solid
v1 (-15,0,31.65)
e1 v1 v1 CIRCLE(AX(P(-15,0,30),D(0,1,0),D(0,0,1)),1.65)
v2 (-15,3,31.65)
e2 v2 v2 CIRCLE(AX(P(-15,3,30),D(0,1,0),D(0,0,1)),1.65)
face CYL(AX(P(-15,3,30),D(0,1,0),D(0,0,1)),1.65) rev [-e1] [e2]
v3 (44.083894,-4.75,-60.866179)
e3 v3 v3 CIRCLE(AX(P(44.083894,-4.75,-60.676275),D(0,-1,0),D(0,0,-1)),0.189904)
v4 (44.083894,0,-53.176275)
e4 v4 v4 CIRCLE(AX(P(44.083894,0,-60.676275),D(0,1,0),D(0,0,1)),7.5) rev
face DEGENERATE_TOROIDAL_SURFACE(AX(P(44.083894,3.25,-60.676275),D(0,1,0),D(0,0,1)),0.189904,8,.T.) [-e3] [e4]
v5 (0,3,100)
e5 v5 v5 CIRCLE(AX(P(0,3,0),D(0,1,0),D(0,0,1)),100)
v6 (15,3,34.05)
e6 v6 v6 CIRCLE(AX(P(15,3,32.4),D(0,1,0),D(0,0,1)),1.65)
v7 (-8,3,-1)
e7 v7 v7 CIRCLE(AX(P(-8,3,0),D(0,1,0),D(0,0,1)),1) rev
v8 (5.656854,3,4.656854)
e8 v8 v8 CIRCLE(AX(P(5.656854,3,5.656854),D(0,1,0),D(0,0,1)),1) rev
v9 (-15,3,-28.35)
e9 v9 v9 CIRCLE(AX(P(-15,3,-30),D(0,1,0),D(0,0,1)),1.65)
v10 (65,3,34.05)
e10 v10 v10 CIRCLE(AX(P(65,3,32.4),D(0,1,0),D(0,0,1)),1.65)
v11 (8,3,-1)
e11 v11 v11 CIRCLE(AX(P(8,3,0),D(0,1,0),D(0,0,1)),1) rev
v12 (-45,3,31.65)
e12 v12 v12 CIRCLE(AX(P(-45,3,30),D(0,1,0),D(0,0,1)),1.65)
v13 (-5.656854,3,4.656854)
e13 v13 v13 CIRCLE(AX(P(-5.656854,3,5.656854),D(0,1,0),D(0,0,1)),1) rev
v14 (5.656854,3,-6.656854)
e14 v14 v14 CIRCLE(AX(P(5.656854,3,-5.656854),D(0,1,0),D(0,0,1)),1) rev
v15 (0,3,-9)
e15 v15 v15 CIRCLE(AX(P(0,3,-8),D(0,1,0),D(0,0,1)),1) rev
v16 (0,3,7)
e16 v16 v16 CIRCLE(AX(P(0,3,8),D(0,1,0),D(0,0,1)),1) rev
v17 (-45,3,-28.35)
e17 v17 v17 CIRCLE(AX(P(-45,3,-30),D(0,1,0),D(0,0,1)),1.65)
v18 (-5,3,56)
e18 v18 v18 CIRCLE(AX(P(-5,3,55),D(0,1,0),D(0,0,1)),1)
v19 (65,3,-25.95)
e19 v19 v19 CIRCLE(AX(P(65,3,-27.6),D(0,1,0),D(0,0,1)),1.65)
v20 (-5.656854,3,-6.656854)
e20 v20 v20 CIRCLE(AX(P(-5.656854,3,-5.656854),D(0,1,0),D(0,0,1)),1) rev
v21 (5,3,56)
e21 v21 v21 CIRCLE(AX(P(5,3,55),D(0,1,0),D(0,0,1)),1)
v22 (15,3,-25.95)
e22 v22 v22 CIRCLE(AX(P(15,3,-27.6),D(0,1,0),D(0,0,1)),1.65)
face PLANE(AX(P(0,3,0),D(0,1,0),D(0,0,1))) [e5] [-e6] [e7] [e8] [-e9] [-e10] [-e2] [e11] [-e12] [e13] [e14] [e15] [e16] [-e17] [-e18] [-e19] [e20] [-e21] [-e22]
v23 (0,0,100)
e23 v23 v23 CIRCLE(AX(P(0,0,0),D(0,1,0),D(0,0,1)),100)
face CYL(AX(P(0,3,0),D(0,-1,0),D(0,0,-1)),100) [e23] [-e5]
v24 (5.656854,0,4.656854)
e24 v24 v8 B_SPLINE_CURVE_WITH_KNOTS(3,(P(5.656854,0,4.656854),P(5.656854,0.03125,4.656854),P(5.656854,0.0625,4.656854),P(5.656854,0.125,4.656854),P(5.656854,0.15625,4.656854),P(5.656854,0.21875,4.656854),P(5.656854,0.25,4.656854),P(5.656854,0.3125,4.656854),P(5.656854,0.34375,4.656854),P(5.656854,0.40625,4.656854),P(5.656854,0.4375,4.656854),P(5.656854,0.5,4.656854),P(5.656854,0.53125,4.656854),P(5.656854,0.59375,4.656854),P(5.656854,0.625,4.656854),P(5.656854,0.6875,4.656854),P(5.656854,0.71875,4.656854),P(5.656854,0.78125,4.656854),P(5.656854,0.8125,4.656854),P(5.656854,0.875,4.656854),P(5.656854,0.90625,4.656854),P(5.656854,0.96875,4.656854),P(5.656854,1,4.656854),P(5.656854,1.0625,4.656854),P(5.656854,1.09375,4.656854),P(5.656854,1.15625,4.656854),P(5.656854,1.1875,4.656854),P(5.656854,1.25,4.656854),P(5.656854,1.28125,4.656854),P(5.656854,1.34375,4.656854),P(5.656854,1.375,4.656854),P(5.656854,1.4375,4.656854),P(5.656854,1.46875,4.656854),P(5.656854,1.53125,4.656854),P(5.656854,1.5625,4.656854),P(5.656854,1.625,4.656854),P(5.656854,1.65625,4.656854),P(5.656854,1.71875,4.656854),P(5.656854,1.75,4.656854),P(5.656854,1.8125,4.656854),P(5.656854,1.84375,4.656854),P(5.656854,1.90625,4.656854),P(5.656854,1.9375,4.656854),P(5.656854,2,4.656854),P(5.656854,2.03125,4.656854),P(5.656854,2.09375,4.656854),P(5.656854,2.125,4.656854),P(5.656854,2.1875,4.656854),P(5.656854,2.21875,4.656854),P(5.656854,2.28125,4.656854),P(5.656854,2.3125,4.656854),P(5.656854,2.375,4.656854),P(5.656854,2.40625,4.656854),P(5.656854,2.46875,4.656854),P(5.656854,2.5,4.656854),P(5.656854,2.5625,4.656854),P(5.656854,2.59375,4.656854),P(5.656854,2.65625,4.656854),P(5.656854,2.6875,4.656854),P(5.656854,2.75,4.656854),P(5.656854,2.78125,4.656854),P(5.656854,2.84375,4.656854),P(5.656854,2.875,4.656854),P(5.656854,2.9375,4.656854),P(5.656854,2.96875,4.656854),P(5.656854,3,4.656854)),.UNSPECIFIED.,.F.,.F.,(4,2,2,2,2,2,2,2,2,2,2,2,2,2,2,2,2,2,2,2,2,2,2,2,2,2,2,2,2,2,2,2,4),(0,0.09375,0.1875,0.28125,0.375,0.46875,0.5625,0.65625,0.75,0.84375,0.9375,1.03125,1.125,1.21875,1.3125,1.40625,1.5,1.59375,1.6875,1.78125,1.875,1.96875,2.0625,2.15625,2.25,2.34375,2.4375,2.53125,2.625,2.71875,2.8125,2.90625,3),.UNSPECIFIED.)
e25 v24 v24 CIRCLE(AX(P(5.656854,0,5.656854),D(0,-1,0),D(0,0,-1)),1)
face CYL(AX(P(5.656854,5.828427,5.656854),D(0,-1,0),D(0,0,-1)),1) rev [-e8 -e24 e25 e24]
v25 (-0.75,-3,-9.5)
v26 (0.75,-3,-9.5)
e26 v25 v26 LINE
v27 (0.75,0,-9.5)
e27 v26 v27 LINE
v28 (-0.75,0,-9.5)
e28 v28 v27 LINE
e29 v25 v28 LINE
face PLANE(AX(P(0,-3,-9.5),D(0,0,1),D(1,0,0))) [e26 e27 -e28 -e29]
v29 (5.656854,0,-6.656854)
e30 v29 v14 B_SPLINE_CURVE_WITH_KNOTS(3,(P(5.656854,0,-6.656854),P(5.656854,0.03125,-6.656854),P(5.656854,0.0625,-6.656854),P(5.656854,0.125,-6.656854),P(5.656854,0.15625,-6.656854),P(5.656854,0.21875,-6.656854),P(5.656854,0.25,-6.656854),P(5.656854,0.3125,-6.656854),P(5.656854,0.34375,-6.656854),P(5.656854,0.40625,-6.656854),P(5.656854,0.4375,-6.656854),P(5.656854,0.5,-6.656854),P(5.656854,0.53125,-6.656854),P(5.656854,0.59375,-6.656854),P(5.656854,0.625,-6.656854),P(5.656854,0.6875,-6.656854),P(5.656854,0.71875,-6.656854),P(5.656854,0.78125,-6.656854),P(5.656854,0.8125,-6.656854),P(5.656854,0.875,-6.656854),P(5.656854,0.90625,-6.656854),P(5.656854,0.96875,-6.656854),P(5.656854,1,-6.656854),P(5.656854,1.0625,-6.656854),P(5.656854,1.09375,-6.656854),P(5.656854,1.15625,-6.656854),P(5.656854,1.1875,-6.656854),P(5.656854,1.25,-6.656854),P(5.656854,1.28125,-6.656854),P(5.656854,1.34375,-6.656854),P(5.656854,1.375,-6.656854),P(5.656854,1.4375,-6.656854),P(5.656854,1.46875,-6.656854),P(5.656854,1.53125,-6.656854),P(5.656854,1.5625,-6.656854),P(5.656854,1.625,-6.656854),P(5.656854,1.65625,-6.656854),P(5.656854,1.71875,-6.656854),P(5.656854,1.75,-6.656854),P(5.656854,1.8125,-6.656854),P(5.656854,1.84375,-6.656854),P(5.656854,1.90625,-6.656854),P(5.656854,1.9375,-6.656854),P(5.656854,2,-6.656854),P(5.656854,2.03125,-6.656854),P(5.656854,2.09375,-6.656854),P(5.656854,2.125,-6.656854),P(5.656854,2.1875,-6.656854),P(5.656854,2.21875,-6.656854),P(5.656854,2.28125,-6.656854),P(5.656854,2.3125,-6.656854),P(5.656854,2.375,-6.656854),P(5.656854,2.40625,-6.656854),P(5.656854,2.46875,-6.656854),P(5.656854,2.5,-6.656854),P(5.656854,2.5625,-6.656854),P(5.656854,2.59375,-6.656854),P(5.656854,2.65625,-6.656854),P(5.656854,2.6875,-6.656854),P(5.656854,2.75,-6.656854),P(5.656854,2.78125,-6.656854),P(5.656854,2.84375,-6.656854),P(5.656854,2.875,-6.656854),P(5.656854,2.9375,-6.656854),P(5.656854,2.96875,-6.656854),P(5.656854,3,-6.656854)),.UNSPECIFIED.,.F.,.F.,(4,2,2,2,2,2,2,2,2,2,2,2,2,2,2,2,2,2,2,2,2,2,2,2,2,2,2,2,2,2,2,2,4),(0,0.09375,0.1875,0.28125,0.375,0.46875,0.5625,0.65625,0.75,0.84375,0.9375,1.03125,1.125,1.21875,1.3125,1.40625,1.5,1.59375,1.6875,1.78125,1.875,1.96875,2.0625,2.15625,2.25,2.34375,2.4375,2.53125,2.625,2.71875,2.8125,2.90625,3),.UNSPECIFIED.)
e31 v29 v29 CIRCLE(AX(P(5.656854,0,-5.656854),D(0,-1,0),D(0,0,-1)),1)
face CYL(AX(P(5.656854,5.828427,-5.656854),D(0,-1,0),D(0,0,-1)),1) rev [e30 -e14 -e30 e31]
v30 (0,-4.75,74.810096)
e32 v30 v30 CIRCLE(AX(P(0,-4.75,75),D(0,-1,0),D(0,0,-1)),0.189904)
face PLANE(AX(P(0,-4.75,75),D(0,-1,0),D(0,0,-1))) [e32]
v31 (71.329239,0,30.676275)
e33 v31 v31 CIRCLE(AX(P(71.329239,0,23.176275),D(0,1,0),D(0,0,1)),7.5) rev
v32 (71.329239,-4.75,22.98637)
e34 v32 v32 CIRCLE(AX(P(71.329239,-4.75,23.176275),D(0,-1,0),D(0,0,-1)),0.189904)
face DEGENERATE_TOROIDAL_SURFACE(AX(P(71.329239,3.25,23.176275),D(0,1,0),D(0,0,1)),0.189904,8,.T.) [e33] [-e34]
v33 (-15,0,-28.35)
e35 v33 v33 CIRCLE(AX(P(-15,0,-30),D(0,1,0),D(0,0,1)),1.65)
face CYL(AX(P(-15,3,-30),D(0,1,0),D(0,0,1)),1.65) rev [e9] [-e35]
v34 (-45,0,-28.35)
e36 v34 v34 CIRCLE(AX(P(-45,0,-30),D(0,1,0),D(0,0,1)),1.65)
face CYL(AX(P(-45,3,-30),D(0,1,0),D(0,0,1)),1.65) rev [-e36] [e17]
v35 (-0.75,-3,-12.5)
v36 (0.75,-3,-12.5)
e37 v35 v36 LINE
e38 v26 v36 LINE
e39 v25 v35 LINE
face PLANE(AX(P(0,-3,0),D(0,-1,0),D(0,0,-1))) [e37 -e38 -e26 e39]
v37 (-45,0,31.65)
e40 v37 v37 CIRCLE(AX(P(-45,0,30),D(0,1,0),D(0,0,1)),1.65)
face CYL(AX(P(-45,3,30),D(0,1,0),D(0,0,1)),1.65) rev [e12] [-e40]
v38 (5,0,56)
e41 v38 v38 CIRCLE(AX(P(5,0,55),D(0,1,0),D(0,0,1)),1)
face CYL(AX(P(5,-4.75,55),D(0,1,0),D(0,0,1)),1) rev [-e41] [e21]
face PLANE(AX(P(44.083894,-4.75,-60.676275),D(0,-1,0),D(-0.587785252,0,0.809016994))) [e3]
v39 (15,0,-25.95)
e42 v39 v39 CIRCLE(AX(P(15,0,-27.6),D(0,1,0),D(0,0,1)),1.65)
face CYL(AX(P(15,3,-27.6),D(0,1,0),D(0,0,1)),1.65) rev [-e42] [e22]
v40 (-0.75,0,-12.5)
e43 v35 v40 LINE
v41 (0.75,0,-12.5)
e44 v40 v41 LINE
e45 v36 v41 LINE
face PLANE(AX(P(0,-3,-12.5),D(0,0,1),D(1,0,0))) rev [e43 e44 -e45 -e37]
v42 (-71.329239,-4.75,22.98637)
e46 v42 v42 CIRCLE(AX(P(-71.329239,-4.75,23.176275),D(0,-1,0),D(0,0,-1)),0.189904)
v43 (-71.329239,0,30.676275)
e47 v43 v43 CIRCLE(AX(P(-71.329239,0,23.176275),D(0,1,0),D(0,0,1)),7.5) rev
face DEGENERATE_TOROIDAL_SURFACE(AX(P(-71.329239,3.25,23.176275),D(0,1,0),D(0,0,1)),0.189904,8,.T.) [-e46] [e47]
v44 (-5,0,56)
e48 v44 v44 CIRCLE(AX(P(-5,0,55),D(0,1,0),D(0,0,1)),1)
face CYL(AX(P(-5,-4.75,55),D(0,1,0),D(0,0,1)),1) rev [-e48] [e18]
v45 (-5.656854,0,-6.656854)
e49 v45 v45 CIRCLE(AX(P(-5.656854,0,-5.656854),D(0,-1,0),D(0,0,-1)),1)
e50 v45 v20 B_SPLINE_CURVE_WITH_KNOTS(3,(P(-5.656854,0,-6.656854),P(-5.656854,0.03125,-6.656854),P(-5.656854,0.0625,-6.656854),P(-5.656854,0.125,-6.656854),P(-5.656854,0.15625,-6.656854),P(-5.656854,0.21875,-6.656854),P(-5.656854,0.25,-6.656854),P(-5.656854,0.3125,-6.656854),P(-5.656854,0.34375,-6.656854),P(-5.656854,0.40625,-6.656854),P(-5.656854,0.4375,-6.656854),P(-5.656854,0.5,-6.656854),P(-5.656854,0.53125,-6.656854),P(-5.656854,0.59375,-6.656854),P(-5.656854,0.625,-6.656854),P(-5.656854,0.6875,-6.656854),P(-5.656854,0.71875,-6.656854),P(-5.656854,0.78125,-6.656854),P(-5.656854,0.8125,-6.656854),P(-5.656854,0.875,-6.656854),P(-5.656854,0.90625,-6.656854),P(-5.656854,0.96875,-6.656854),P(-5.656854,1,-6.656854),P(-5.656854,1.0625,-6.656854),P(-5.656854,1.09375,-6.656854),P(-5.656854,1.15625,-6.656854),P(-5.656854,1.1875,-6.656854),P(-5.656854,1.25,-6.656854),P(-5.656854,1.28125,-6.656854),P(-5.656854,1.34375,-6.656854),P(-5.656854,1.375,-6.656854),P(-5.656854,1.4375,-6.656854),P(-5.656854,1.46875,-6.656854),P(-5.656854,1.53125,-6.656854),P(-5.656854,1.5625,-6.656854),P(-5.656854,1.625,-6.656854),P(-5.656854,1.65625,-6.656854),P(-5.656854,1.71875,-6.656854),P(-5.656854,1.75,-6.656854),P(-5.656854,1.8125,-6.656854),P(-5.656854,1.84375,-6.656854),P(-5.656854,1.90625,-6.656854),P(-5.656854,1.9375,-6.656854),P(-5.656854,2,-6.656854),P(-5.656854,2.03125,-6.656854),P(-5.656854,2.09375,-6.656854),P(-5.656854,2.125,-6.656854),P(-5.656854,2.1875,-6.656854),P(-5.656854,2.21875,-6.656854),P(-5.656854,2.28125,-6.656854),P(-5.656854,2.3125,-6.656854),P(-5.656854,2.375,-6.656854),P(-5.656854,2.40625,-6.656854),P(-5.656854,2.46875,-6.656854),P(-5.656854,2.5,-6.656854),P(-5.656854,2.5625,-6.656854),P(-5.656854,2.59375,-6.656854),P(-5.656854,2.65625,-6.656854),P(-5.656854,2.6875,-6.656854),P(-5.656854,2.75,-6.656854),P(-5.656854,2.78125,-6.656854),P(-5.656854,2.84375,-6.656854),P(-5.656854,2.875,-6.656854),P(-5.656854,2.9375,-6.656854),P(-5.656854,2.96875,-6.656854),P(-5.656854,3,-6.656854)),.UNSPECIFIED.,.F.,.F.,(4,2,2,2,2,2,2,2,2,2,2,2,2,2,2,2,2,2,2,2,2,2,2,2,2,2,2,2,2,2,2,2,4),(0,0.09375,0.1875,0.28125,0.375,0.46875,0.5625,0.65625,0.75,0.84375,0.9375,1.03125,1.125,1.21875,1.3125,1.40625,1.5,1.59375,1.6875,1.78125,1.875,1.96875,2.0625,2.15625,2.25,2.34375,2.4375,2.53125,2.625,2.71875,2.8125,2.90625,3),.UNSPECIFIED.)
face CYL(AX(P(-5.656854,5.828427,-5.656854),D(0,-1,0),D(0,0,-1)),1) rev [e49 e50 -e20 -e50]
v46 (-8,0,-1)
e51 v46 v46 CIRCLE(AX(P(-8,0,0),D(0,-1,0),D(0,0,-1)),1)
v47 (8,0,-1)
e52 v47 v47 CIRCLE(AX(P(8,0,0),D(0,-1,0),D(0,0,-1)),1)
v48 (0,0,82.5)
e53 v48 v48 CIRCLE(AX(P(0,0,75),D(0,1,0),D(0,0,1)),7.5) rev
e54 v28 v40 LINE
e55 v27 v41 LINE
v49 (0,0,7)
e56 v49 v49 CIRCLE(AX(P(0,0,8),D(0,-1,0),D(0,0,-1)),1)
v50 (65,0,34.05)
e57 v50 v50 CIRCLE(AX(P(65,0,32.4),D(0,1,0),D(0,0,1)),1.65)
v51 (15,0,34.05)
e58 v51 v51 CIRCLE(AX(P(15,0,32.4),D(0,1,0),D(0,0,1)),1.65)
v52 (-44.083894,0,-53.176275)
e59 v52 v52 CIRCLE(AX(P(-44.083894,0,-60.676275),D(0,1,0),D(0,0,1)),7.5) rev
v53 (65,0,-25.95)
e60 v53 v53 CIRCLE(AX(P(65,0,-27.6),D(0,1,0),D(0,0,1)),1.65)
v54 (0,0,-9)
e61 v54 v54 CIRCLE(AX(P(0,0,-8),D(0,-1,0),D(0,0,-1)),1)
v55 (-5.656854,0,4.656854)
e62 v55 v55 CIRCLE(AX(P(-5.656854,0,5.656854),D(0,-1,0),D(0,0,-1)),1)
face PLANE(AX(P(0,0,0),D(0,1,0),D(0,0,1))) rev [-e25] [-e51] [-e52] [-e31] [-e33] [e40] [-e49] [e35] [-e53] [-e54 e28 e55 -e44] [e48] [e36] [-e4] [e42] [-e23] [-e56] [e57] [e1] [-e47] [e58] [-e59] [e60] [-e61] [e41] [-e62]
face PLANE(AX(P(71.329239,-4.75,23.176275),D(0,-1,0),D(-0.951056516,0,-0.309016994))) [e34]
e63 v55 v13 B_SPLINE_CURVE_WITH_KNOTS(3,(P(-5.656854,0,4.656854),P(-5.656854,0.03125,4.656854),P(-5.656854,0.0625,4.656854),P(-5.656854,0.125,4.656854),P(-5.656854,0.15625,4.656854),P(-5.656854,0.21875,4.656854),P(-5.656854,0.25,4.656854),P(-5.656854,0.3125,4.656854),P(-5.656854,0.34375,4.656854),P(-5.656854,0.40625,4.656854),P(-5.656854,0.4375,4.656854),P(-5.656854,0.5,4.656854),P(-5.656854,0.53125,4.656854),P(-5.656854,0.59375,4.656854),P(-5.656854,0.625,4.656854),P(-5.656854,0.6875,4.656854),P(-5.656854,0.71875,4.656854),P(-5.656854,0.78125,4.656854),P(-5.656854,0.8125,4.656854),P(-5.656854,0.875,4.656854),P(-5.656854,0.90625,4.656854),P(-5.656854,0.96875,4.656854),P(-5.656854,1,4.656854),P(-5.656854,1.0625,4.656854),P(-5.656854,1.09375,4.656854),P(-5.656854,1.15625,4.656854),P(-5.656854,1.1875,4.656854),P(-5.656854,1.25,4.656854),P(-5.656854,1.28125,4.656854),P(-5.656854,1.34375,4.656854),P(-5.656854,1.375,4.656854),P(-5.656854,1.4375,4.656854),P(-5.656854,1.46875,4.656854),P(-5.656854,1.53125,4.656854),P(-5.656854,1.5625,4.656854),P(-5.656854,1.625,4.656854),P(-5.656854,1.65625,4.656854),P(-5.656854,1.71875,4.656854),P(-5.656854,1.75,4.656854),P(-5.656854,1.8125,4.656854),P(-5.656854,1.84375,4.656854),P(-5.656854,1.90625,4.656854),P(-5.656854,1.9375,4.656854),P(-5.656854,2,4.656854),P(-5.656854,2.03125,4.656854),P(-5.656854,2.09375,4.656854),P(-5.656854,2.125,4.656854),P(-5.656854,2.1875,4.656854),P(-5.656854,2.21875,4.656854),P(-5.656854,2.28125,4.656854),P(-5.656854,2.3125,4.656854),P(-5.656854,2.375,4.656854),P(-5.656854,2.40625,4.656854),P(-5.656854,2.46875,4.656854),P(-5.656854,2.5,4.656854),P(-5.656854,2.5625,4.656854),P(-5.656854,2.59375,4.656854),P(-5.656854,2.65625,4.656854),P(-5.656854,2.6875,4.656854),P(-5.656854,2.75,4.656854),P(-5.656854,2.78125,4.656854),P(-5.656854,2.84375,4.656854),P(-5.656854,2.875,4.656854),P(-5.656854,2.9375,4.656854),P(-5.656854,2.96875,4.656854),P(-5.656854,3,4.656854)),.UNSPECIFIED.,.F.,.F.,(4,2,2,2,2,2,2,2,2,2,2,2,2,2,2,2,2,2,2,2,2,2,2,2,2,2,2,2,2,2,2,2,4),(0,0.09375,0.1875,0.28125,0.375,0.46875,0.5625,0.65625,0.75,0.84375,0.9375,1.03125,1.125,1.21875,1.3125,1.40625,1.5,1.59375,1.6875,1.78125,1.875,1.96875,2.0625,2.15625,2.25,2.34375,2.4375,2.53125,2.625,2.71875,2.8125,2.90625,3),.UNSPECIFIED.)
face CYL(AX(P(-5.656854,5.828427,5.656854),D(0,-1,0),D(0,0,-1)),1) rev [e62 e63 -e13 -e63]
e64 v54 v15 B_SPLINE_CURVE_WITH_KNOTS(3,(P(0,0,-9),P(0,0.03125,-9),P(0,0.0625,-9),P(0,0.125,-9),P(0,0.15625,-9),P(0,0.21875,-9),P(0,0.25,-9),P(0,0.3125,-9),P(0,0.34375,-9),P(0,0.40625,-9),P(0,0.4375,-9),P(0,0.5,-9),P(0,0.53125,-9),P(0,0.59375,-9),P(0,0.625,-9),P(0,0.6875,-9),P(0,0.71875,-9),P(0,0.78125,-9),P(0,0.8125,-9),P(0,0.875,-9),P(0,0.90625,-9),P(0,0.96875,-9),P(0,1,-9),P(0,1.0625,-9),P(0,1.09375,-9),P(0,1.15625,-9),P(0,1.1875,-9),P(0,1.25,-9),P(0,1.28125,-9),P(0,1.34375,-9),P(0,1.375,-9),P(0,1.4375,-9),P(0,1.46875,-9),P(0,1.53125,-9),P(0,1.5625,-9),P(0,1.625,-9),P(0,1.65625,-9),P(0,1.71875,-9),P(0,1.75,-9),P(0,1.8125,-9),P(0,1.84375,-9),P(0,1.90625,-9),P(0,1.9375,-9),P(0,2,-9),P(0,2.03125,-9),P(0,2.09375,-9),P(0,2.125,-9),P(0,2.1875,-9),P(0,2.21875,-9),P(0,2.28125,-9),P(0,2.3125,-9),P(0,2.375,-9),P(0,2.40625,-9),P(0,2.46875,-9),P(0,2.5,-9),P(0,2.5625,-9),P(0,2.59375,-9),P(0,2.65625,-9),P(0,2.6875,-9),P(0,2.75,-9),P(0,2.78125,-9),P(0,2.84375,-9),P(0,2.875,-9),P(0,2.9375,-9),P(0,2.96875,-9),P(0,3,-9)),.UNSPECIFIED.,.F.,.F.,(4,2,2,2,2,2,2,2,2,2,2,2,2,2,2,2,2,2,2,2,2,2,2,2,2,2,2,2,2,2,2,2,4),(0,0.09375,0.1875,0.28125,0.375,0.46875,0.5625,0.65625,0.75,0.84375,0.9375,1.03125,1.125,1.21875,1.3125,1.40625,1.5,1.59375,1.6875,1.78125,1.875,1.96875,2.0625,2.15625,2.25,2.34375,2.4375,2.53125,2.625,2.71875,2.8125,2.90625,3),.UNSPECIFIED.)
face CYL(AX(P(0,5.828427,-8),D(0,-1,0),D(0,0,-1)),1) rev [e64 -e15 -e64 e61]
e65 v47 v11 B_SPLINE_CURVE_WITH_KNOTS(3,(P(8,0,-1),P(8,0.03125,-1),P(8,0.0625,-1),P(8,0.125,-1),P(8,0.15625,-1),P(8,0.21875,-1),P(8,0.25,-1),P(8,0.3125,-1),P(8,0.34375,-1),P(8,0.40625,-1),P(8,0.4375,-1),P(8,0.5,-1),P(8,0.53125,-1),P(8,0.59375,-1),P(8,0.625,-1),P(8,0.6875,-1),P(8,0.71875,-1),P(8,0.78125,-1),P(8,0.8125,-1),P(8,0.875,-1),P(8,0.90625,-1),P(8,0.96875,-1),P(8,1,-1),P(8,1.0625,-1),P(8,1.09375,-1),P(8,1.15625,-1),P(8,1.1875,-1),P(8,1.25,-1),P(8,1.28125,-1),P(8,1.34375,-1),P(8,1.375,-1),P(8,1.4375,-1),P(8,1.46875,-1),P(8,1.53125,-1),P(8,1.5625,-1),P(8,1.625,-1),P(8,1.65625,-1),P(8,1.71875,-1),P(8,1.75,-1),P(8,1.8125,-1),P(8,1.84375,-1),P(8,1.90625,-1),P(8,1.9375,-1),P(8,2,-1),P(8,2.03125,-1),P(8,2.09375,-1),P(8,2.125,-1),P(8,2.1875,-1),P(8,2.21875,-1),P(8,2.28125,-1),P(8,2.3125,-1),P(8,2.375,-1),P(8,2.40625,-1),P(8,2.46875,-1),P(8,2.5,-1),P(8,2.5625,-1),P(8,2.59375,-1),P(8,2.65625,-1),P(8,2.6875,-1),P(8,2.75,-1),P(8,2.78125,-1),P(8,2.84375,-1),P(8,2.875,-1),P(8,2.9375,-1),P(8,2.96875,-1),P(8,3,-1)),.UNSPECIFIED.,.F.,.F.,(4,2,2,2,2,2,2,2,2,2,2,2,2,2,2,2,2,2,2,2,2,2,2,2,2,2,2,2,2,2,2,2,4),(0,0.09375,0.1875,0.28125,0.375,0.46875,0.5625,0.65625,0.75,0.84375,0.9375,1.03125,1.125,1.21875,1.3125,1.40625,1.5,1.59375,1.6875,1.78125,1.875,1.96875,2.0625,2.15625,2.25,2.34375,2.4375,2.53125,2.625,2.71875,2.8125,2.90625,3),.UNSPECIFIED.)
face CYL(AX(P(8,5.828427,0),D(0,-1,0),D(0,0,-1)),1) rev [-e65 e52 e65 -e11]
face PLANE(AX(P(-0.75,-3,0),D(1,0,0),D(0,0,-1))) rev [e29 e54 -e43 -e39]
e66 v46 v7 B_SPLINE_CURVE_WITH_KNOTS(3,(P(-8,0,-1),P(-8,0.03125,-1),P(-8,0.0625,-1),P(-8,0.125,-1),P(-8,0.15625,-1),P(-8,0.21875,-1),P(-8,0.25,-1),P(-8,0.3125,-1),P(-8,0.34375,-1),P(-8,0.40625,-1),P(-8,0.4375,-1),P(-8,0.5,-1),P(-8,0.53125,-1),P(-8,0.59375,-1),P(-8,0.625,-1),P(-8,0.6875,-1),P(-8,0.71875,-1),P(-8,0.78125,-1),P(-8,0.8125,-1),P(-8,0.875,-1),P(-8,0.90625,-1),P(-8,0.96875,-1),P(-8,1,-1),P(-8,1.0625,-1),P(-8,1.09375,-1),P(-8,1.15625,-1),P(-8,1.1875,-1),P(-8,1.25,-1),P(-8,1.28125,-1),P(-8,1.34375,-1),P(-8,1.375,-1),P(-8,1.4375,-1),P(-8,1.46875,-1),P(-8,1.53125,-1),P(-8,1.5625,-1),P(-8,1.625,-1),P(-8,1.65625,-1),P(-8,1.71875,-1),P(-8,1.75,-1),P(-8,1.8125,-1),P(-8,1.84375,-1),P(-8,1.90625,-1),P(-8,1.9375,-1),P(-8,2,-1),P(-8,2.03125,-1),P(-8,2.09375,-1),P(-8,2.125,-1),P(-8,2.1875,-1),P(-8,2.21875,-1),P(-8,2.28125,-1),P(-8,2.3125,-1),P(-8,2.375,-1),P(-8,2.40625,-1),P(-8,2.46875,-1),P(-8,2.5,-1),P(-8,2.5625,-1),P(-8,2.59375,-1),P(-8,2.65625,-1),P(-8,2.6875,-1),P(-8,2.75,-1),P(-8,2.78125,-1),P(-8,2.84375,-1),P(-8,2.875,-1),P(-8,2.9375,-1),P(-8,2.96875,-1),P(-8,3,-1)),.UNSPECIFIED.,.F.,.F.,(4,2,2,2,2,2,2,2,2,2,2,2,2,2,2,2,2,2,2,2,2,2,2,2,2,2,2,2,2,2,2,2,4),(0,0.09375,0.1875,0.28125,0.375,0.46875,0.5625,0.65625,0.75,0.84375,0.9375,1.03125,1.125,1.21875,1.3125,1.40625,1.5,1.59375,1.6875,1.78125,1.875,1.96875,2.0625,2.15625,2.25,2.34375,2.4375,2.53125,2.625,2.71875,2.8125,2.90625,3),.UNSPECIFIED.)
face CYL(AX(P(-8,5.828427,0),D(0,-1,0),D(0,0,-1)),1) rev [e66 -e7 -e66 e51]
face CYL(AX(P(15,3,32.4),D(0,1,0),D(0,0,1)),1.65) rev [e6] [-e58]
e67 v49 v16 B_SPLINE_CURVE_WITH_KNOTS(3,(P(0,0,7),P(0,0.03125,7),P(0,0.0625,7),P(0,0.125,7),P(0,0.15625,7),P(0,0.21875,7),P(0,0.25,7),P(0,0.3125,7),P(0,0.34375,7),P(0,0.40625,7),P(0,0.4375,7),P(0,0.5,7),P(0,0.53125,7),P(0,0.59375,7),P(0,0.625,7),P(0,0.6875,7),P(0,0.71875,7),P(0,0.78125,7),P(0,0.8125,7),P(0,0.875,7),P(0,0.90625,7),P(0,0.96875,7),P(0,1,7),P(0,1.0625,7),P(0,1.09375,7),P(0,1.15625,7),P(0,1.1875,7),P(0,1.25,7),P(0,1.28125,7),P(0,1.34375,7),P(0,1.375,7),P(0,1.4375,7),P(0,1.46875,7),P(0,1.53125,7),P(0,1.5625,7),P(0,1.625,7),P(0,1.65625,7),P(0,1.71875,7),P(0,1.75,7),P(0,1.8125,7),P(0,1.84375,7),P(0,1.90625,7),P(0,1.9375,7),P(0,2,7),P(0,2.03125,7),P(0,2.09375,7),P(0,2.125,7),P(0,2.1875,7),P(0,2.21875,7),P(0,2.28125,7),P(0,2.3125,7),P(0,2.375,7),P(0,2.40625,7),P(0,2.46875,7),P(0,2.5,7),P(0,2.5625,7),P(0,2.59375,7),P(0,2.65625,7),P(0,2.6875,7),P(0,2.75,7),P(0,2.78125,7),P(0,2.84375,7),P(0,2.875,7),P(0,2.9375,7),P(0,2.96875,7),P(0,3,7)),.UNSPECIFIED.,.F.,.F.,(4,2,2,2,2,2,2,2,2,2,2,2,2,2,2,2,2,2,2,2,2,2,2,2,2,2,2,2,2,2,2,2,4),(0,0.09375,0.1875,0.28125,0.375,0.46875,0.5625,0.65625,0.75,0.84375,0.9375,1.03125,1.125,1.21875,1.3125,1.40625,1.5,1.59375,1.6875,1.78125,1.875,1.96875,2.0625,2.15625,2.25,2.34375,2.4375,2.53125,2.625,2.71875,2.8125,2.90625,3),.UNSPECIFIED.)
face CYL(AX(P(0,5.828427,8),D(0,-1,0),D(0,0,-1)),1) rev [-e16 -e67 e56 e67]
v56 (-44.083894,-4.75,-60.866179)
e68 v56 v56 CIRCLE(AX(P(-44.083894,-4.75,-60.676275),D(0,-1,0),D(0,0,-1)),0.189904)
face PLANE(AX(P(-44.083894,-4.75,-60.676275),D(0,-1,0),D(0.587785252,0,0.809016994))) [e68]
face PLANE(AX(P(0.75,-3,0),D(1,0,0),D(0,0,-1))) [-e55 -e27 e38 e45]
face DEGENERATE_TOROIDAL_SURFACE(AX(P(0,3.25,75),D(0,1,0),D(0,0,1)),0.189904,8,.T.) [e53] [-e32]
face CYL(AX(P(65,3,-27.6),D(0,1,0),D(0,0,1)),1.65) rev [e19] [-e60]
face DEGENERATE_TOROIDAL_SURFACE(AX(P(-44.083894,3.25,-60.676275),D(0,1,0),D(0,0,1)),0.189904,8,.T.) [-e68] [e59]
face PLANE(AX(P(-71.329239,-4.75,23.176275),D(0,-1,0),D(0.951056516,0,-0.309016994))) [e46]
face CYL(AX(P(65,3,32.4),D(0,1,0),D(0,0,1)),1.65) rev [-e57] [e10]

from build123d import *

# Parameters (mm, degrees)
SKETCH2_R                   = 100
BOSS_EXTRUDE1_DEPTH         = 3
SKETCH3_R                   = 7.5
BOSS_EXTRUDE2_DEPTH         = 4.75
CIRPATTERN1_COUNT           = 5
FILLET3_R                   = 8
SKETCH5_R                   = 1
CUT_EXTRUDE1_DEPTH          = 3
BOSS_EXTRUDE3_DEPTH         = 3
TAP_DRILL_FOR_M4X0_7_TAP1_D = 3.3
TAP_DRILL_FOR_M4X0_7_TAP2_D = 3.3
SKETCH10_R                  = 1
CUT_EXTRUDE2_DEPTH          = 142.633550056


with BuildPart() as part:
    # Sketch2 → Boss-Extrude1 (new body)
    with BuildSketch(Plane(origin=(0, 0, 0), x_dir=(1, 0, 0), z_dir=(0, 1, 0))):
        with Locations(Location((0, 0, 0), (0, 0, 270))):
            Circle(SKETCH2_R)
    extrude(amount=BOSS_EXTRUDE1_DEPTH)

    # Sketch3 → Boss-Extrude2 (add)
    with BuildSketch(Plane.XZ):
        with Locations(Location((0, 75, 0), (0, 0, 90))):
            Circle(SKETCH3_R)
    boss_extrude2 = extrude(amount=BOSS_EXTRUDE2_DEPTH)

    # CirPattern1: Boss-Extrude2 ×5 about axis
    cirpattern1_axis = Axis((0, 0, 0), (0, 1, 0))
    for i in range(1, CIRPATTERN1_COUNT):
        add(boss_extrude2.rotate(cirpattern1_axis, i * 360 / CIRPATTERN1_COUNT))

    # Fillet3
    # the kernel refuses this fillet: 8 mm, written as the material it takes off along each edge
    with BuildSketch(Plane(origin=(-71.329238722, -4.75, 23.176274578), x_dir=(-0.9510565162951535, 0, 0.30901699437494723), z_dir=(0.30901699437494723, 0, 0.9510565162951535))) as fillet3_piece_1:
        with BuildLine():
            CenterArc((0.189904241, -8), FILLET3_R, 23.969482318, 66.030517682)
            Line((0.189904241, 0), (0.189904241, 0.16))
            Line((0.189904241, 0.16), (7.5, 0.16))
            Line((7.5, 0.16), (7.66, 0))
            ThreePointArc((7.66, 0), (7.66, -2.375), (7.646201915, -4.685))
            Line((7.646201915, -4.685), (7.5, -4.75))
        make_face()
    revolve(axis=Axis((-71.329238722, -4.75, 23.176274578), (0, -1, 0)), mode=Mode.SUBTRACT)
    with BuildSketch(Plane(origin=(-44.083893922, -4.75, -60.676274578), x_dir=(-0.5877852522924734, 0, -0.8090169943749472), z_dir=(-0.8090169943749472, 0, 0.5877852522924734))) as fillet3_piece_2:
        with BuildLine():
            CenterArc((0.189904241, -8), FILLET3_R, 23.969482318, 66.030517682)
            Line((0.189904241, 0), (0.189904241, 0.16))
            Line((0.189904241, 0.16), (7.5, 0.16))
            Line((7.5, 0.16), (7.66, 0))
            ThreePointArc((7.66, 0), (7.66, -2.375), (7.646201915, -4.685))
            Line((7.646201915, -4.685), (7.5, -4.75))
        make_face()
    revolve(axis=Axis((-44.083893922, -4.75, -60.676274578), (0, -1, 0)), mode=Mode.SUBTRACT)
    with BuildSketch(Plane(origin=(44.083893922, -4.75, -60.676274578), x_dir=(0.5877852522924734, 0, -0.8090169943749472), z_dir=(-0.8090169943749472, 0, -0.5877852522924734))) as fillet3_piece_3:
        with BuildLine():
            CenterArc((0.189904241, -8), FILLET3_R, 23.969482318, 66.030517682)
            Line((0.189904241, 0), (0.189904241, 0.16))
            Line((0.189904241, 0.16), (7.5, 0.16))
            Line((7.5, 0.16), (7.66, 0))
            ThreePointArc((7.66, 0), (7.66, -2.375), (7.646201915, -4.685))
            Line((7.646201915, -4.685), (7.5, -4.75))
        make_face()
    revolve(axis=Axis((44.083893922, -4.75, -60.676274578), (0, -1, 0)), mode=Mode.SUBTRACT)
    with BuildSketch(Plane(origin=(71.329238722, -4.75, 23.176274578), x_dir=(0.9510565162951535, 0, 0.30901699437494723), z_dir=(0.30901699437494723, 0, -0.9510565162951535))) as fillet3_piece_4:
        with BuildLine():
            CenterArc((0.189904241, -8), FILLET3_R, 23.969482318, 66.030517682)
            Line((0.189904241, 0), (0.189904241, 0.16))
            Line((0.189904241, 0.16), (7.5, 0.16))
            Line((7.5, 0.16), (7.66, 0))
            ThreePointArc((7.66, 0), (7.66, -2.375), (7.646201915, -4.685))
            Line((7.646201915, -4.685), (7.5, -4.75))
        make_face()
    revolve(axis=Axis((71.329238722, -4.75, 23.176274578), (0, -1, 0)), mode=Mode.SUBTRACT)
    with BuildSketch(Plane(origin=(0, -4.75, 75), x_dir=(0, 0, 1), z_dir=(1, 0, 0))) as fillet3_piece_5:
        with BuildLine():
            CenterArc((0.189904241, -8), FILLET3_R, 23.969482318, 66.030517682)
            Line((0.189904241, 0), (0.189904241, 0.16))
            Line((0.189904241, 0.16), (7.5, 0.16))
            Line((7.5, 0.16), (7.66, 0))
            ThreePointArc((7.66, 0), (7.66, -2.375), (7.646201915, -4.685))
            Line((7.646201915, -4.685), (7.5, -4.75))
        make_face()
    revolve(axis=Axis((0, -4.75, 75), (0, -1, 0)), mode=Mode.SUBTRACT)

    # Sketch5 → Cut-Extrude1 (cut)
    with BuildSketch(Plane.XZ):
        with Locations(Location((0, 8, 0), (0, 0, 270))):
            Circle(SKETCH5_R)
        with Locations(Location((5.656854249, 5.656854249, 0), (0, 0, 270))):
            Circle(SKETCH5_R)
        with Locations(Location((8, 0, 0), (0, 0, 270))):
            Circle(SKETCH5_R)
        with Locations(Location((5.656854249, -5.656854249, 0), (0, 0, 270))):
            Circle(SKETCH5_R)
        with Locations(Location((0, -8, 0), (0, 0, 270))):
            Circle(SKETCH5_R)
        with Locations(Location((-5.656854249, -5.656854249, 0), (0, 0, 270))):
            Circle(SKETCH5_R)
        with Locations(Location((-8, 0, 0), (0, 0, 270))):
            Circle(SKETCH5_R)
        with Locations(Location((-5.656854249, 5.656854249, 0), (0, 0, 270))):
            Circle(SKETCH5_R)
    extrude(amount=-CUT_EXTRUDE1_DEPTH, mode=Mode.SUBTRACT)

    # Sketch5<3> → Boss-Extrude3 (add)
    with BuildSketch(Plane.XZ):
        with BuildLine():
            Line((0.75, -9.5), (-0.75, -9.5))
            Line((-0.75, -9.5), (-0.75, -10.974402034))
            ThreePointArc((-0.75, -10.974402034), (0, -11), (0.75, -10.974402034))
            Line((0.75, -10.974402034), (0.75, -9.5))
        make_face()
        with BuildLine():
            ThreePointArc((0.75, -10.974402034), (0, -11), (-0.75, -10.974402034))
            Line((-0.75, -10.974402034), (-0.75, -12.5))
            Line((-0.75, -12.5), (0.75, -12.5))
            Line((0.75, -12.5), (0.75, -10.974402034))
        make_face()
    extrude(amount=BOSS_EXTRUDE3_DEPTH)

    # Tap Drill for M4x0.7 Tap1 (through all)
    with Locations(Plane(origin=(-45, 3, -30), x_dir=(0, 0, 1), z_dir=(0, 1, 0))):
        with Locations((0, 0), (0, 30), (60, 0), (60, 30)):
            Hole(TAP_DRILL_FOR_M4X0_7_TAP1_D / 2)

    # Tap Drill for M4x0.7 Tap2 (through all)
    with Locations(Plane(origin=(15, 3, -27.6), x_dir=(0, 0, 1), z_dir=(0, 1, 0))):
        with Locations((0, 0), (60, 0), (60, 50), (0, 50)):
            Hole(TAP_DRILL_FOR_M4X0_7_TAP2_D / 2)

    # Sketch10 → Cut-Extrude2 (cut, through all)
    with BuildSketch(Plane(origin=(0, 3, 0), x_dir=(1, 0, 0), z_dir=(0, 1, 0))):
        with Locations(Location((5, -55, 0), (0, 0, 270))):
            Circle(SKETCH10_R)
        with Locations(Location((-5, -55, 0), (0, 0, 270))):
            Circle(SKETCH10_R)
    extrude(amount=-CUT_EXTRUDE2_DEPTH, mode=Mode.SUBTRACT)


solid = part.part
